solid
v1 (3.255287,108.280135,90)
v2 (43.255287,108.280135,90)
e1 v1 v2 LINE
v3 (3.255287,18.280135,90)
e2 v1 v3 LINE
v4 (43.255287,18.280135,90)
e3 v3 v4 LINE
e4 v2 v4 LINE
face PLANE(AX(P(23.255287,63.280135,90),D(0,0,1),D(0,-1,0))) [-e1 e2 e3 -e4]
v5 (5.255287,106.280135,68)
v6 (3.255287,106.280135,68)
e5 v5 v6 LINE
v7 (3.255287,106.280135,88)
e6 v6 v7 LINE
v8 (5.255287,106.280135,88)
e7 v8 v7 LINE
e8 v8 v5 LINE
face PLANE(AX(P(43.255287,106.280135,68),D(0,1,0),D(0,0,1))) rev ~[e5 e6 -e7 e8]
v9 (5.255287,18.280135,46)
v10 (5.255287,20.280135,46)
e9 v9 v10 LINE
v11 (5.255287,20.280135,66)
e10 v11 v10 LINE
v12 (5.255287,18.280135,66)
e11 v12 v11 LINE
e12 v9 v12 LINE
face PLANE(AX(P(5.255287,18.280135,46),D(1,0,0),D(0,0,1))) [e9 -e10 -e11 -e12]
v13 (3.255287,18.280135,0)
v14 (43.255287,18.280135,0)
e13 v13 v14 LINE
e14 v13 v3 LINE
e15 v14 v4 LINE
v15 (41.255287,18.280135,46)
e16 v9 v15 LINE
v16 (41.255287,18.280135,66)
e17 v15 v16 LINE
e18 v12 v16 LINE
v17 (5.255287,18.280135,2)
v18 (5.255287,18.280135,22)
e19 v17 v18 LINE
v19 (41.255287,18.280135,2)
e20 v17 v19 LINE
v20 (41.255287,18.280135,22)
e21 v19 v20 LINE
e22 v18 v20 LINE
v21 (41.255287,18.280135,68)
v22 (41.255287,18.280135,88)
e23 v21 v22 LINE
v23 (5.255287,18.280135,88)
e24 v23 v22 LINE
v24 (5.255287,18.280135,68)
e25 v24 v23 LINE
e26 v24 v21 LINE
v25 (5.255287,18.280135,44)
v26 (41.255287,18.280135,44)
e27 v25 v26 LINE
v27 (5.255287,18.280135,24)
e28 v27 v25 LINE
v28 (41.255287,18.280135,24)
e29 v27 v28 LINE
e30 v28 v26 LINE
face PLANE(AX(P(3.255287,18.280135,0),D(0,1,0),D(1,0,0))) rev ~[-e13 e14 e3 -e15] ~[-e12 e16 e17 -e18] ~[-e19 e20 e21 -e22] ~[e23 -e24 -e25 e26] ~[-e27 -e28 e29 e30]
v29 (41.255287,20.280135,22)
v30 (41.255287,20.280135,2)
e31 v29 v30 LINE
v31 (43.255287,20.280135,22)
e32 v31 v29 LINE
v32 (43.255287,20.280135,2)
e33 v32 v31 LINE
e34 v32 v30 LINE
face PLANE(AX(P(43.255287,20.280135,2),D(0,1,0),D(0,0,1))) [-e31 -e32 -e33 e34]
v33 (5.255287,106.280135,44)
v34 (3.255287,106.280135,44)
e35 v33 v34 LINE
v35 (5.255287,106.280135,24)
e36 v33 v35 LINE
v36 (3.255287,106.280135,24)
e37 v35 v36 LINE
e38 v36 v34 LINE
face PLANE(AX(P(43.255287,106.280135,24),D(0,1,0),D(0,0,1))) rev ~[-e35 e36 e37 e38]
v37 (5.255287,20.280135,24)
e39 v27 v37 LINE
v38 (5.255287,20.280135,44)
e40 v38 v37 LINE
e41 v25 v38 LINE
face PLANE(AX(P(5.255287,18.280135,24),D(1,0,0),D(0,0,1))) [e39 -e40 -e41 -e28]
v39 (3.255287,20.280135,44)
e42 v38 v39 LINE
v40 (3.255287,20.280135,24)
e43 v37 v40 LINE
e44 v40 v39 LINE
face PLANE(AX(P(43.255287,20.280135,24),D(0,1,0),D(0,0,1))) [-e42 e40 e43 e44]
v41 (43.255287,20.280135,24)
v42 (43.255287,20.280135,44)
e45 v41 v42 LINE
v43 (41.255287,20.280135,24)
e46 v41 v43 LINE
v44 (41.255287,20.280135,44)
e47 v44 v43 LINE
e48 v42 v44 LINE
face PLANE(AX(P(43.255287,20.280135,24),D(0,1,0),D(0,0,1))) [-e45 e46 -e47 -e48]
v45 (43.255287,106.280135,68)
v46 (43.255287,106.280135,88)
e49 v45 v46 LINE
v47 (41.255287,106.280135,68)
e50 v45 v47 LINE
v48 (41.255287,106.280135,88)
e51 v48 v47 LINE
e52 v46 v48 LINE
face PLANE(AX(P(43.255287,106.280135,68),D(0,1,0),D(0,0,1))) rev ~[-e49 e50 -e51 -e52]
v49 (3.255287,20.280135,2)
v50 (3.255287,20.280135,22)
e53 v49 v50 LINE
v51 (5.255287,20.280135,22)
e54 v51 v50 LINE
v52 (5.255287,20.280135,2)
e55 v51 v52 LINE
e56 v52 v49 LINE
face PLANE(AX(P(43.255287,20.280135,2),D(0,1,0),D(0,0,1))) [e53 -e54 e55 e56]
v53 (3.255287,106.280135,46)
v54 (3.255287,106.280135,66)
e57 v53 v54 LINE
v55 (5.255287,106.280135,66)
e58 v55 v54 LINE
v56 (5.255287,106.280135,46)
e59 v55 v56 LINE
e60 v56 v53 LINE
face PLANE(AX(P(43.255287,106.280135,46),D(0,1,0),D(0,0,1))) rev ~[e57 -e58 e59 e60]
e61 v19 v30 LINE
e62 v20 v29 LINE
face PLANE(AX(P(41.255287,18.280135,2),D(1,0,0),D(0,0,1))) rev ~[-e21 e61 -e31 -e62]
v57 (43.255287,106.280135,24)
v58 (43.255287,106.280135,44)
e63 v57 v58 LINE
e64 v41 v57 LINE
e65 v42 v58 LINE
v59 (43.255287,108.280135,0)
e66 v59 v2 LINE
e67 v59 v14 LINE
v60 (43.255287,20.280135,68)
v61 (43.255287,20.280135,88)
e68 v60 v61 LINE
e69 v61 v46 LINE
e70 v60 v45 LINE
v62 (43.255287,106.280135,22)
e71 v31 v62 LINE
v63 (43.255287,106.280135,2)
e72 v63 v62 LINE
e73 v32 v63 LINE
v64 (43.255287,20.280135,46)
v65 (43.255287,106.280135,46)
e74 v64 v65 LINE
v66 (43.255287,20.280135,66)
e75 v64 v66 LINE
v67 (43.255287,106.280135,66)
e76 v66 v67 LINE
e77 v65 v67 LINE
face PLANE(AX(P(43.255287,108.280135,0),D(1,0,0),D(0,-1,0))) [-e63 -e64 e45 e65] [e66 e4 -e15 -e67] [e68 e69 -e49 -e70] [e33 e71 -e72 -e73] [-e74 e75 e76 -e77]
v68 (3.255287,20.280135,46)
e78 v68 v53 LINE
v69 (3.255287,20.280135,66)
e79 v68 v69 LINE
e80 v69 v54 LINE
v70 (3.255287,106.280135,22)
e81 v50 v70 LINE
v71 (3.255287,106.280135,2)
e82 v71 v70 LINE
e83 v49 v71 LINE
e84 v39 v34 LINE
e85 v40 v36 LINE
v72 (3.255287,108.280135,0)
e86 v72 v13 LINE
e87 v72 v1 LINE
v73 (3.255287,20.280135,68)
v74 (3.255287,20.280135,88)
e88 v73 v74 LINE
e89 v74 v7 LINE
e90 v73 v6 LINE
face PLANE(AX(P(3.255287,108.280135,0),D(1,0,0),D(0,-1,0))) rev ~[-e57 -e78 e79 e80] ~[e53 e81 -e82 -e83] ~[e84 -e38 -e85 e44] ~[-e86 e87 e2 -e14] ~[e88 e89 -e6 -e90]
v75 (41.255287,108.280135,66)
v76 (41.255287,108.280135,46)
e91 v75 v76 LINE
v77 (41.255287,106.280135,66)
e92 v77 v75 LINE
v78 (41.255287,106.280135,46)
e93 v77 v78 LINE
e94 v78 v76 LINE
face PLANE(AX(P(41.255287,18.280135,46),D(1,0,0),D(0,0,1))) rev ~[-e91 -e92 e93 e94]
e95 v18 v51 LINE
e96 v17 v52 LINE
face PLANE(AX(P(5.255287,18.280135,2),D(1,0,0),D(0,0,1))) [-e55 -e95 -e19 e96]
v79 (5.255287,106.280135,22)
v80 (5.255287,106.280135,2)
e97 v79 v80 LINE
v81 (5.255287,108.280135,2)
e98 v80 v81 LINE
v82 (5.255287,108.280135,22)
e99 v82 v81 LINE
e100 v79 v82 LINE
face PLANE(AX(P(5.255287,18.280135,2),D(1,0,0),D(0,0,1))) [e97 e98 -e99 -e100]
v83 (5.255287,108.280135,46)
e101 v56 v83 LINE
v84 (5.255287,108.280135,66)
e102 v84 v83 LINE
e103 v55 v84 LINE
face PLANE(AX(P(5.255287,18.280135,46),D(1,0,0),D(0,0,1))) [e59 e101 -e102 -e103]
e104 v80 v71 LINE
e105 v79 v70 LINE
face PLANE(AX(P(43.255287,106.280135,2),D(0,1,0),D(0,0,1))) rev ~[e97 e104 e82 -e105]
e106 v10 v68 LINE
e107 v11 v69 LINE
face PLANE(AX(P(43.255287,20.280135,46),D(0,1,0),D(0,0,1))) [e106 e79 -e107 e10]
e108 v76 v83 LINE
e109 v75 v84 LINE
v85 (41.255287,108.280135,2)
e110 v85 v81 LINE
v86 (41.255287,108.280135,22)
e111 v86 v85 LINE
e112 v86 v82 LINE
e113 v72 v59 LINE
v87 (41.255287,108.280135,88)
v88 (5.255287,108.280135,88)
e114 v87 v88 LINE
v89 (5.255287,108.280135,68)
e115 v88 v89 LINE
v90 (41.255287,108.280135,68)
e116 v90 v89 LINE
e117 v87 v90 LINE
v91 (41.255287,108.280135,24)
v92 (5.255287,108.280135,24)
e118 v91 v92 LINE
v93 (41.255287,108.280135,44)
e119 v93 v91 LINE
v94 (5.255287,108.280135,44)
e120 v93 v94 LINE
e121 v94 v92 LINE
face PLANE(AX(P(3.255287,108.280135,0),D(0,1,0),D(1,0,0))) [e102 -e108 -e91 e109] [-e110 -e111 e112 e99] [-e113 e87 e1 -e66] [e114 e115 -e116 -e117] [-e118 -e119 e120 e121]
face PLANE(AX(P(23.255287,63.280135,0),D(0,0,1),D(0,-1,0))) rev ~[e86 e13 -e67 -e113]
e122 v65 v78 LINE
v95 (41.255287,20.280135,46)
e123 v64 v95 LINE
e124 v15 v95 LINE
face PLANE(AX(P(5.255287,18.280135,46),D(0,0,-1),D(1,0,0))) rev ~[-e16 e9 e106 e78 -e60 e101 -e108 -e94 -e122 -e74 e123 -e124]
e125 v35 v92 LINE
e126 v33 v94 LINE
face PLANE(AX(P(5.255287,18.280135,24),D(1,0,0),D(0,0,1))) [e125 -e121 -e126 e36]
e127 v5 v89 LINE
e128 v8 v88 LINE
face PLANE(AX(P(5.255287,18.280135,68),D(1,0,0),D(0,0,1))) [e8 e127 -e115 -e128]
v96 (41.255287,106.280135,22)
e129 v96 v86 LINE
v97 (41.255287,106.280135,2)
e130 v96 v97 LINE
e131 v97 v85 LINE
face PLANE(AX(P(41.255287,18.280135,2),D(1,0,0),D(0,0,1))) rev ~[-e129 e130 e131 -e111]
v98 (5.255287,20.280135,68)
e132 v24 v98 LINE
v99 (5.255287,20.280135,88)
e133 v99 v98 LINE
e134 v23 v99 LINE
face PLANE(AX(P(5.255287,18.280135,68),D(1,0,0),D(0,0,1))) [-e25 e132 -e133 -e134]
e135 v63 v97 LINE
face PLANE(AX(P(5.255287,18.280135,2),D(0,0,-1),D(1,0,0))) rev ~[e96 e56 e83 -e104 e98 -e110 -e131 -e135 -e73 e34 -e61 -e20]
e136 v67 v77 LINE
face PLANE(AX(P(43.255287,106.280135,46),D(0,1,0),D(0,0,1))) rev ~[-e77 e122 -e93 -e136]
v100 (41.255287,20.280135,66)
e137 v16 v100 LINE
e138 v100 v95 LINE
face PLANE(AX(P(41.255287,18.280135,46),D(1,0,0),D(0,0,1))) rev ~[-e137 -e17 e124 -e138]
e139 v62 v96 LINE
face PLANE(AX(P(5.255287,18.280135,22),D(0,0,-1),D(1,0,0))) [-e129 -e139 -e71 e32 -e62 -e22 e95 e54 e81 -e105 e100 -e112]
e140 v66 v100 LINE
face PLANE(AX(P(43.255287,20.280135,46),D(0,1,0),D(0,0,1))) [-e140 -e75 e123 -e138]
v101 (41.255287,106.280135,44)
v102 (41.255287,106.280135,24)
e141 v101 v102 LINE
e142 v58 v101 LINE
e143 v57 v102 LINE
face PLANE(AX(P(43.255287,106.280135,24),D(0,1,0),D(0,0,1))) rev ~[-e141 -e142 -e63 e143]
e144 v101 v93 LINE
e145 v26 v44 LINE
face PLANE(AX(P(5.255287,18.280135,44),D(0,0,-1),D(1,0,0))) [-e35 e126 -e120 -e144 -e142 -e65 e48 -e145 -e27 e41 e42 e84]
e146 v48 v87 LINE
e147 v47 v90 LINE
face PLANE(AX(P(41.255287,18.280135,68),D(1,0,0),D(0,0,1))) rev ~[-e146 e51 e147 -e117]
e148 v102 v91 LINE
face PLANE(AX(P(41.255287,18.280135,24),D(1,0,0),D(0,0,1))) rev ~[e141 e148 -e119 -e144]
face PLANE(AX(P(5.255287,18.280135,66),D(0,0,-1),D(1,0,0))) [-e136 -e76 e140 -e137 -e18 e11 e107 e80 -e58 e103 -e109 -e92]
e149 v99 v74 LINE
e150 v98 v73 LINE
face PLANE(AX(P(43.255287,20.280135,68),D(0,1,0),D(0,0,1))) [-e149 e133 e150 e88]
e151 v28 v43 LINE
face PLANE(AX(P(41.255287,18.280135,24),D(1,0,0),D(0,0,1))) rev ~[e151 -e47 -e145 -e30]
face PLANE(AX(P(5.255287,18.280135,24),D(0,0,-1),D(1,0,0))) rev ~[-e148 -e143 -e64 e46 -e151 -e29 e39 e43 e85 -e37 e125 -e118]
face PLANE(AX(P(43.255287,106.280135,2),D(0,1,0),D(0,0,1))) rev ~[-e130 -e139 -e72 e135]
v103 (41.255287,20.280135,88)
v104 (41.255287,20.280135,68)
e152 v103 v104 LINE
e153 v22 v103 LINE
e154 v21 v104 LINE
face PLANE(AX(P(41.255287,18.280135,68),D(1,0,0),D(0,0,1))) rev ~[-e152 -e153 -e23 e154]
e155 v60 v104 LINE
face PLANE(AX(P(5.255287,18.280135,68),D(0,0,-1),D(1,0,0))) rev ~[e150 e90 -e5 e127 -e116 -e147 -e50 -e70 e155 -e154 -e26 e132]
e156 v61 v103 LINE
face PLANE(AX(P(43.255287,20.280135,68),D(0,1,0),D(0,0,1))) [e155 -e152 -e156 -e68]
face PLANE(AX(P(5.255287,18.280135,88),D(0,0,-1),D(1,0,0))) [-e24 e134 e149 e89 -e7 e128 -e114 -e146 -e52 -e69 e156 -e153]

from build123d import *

# Parameters (mm, degrees)
F0_W     = 90
F0_H     = 40
F1_DEPTH = 90
F2_ANGLE = 90
F3_W     = 86
F3_H     = 20
F4_DEPTH = 40.001
F5_W     = 36
F5_H     = 20
F6_DEPTH = 90.001


# Not quite as in the source:
# - a feature names something its author has since deleted; it is built from what else it names


with BuildPart() as f1:
    # F0 (on Top) → F1 (new body)
    with BuildSketch(Plane.XY):
        with Locations((-1.7447127029, -1.7198646705)):
            Rectangle(F0_W, F0_H)
    extrude(amount=F1_DEPTH)


with BuildPart() as f1_1:
    # F2: moved
    add(f1.part.rotate(Axis((43.2552872971, 18.2801353295, 45), (0, 0, -1)), F2_ANGLE))

    # F3 (on face) → F4 (cut, through all)
    with BuildSketch(Plane.YZ.offset(43.2552872971)):
        with Locations((63.2801353295, 78)):
            Rectangle(F3_W, F3_H)
        with Locations((63.2801353295, 56)):
            Rectangle(F3_W, F3_H)
        with Locations((63.2801353295, 34)):
            Rectangle(F3_W, F3_H)
        with Locations((63.2801353295, 12)):
            Rectangle(F3_W, F3_H)
    extrude(amount=-F4_DEPTH, mode=Mode.SUBTRACT)

    # F5 (on face) → F6 (cut, through all)
    with BuildSketch(Plane.XZ.offset(-18.2801353295)):
        with Locations((23.2552872971, 78)):
            Rectangle(F5_W, F5_H)
        with Locations((23.2552872971, 56)):
            Rectangle(F5_W, F5_H)
        with Locations((23.2552872971, 34)):
            Rectangle(F5_W, F5_H)
        with Locations((23.2552872971, 12)):
            Rectangle(F5_W, F5_H)
    extrude(amount=-F6_DEPTH, mode=Mode.SUBTRACT)


solid = f1_1.part
